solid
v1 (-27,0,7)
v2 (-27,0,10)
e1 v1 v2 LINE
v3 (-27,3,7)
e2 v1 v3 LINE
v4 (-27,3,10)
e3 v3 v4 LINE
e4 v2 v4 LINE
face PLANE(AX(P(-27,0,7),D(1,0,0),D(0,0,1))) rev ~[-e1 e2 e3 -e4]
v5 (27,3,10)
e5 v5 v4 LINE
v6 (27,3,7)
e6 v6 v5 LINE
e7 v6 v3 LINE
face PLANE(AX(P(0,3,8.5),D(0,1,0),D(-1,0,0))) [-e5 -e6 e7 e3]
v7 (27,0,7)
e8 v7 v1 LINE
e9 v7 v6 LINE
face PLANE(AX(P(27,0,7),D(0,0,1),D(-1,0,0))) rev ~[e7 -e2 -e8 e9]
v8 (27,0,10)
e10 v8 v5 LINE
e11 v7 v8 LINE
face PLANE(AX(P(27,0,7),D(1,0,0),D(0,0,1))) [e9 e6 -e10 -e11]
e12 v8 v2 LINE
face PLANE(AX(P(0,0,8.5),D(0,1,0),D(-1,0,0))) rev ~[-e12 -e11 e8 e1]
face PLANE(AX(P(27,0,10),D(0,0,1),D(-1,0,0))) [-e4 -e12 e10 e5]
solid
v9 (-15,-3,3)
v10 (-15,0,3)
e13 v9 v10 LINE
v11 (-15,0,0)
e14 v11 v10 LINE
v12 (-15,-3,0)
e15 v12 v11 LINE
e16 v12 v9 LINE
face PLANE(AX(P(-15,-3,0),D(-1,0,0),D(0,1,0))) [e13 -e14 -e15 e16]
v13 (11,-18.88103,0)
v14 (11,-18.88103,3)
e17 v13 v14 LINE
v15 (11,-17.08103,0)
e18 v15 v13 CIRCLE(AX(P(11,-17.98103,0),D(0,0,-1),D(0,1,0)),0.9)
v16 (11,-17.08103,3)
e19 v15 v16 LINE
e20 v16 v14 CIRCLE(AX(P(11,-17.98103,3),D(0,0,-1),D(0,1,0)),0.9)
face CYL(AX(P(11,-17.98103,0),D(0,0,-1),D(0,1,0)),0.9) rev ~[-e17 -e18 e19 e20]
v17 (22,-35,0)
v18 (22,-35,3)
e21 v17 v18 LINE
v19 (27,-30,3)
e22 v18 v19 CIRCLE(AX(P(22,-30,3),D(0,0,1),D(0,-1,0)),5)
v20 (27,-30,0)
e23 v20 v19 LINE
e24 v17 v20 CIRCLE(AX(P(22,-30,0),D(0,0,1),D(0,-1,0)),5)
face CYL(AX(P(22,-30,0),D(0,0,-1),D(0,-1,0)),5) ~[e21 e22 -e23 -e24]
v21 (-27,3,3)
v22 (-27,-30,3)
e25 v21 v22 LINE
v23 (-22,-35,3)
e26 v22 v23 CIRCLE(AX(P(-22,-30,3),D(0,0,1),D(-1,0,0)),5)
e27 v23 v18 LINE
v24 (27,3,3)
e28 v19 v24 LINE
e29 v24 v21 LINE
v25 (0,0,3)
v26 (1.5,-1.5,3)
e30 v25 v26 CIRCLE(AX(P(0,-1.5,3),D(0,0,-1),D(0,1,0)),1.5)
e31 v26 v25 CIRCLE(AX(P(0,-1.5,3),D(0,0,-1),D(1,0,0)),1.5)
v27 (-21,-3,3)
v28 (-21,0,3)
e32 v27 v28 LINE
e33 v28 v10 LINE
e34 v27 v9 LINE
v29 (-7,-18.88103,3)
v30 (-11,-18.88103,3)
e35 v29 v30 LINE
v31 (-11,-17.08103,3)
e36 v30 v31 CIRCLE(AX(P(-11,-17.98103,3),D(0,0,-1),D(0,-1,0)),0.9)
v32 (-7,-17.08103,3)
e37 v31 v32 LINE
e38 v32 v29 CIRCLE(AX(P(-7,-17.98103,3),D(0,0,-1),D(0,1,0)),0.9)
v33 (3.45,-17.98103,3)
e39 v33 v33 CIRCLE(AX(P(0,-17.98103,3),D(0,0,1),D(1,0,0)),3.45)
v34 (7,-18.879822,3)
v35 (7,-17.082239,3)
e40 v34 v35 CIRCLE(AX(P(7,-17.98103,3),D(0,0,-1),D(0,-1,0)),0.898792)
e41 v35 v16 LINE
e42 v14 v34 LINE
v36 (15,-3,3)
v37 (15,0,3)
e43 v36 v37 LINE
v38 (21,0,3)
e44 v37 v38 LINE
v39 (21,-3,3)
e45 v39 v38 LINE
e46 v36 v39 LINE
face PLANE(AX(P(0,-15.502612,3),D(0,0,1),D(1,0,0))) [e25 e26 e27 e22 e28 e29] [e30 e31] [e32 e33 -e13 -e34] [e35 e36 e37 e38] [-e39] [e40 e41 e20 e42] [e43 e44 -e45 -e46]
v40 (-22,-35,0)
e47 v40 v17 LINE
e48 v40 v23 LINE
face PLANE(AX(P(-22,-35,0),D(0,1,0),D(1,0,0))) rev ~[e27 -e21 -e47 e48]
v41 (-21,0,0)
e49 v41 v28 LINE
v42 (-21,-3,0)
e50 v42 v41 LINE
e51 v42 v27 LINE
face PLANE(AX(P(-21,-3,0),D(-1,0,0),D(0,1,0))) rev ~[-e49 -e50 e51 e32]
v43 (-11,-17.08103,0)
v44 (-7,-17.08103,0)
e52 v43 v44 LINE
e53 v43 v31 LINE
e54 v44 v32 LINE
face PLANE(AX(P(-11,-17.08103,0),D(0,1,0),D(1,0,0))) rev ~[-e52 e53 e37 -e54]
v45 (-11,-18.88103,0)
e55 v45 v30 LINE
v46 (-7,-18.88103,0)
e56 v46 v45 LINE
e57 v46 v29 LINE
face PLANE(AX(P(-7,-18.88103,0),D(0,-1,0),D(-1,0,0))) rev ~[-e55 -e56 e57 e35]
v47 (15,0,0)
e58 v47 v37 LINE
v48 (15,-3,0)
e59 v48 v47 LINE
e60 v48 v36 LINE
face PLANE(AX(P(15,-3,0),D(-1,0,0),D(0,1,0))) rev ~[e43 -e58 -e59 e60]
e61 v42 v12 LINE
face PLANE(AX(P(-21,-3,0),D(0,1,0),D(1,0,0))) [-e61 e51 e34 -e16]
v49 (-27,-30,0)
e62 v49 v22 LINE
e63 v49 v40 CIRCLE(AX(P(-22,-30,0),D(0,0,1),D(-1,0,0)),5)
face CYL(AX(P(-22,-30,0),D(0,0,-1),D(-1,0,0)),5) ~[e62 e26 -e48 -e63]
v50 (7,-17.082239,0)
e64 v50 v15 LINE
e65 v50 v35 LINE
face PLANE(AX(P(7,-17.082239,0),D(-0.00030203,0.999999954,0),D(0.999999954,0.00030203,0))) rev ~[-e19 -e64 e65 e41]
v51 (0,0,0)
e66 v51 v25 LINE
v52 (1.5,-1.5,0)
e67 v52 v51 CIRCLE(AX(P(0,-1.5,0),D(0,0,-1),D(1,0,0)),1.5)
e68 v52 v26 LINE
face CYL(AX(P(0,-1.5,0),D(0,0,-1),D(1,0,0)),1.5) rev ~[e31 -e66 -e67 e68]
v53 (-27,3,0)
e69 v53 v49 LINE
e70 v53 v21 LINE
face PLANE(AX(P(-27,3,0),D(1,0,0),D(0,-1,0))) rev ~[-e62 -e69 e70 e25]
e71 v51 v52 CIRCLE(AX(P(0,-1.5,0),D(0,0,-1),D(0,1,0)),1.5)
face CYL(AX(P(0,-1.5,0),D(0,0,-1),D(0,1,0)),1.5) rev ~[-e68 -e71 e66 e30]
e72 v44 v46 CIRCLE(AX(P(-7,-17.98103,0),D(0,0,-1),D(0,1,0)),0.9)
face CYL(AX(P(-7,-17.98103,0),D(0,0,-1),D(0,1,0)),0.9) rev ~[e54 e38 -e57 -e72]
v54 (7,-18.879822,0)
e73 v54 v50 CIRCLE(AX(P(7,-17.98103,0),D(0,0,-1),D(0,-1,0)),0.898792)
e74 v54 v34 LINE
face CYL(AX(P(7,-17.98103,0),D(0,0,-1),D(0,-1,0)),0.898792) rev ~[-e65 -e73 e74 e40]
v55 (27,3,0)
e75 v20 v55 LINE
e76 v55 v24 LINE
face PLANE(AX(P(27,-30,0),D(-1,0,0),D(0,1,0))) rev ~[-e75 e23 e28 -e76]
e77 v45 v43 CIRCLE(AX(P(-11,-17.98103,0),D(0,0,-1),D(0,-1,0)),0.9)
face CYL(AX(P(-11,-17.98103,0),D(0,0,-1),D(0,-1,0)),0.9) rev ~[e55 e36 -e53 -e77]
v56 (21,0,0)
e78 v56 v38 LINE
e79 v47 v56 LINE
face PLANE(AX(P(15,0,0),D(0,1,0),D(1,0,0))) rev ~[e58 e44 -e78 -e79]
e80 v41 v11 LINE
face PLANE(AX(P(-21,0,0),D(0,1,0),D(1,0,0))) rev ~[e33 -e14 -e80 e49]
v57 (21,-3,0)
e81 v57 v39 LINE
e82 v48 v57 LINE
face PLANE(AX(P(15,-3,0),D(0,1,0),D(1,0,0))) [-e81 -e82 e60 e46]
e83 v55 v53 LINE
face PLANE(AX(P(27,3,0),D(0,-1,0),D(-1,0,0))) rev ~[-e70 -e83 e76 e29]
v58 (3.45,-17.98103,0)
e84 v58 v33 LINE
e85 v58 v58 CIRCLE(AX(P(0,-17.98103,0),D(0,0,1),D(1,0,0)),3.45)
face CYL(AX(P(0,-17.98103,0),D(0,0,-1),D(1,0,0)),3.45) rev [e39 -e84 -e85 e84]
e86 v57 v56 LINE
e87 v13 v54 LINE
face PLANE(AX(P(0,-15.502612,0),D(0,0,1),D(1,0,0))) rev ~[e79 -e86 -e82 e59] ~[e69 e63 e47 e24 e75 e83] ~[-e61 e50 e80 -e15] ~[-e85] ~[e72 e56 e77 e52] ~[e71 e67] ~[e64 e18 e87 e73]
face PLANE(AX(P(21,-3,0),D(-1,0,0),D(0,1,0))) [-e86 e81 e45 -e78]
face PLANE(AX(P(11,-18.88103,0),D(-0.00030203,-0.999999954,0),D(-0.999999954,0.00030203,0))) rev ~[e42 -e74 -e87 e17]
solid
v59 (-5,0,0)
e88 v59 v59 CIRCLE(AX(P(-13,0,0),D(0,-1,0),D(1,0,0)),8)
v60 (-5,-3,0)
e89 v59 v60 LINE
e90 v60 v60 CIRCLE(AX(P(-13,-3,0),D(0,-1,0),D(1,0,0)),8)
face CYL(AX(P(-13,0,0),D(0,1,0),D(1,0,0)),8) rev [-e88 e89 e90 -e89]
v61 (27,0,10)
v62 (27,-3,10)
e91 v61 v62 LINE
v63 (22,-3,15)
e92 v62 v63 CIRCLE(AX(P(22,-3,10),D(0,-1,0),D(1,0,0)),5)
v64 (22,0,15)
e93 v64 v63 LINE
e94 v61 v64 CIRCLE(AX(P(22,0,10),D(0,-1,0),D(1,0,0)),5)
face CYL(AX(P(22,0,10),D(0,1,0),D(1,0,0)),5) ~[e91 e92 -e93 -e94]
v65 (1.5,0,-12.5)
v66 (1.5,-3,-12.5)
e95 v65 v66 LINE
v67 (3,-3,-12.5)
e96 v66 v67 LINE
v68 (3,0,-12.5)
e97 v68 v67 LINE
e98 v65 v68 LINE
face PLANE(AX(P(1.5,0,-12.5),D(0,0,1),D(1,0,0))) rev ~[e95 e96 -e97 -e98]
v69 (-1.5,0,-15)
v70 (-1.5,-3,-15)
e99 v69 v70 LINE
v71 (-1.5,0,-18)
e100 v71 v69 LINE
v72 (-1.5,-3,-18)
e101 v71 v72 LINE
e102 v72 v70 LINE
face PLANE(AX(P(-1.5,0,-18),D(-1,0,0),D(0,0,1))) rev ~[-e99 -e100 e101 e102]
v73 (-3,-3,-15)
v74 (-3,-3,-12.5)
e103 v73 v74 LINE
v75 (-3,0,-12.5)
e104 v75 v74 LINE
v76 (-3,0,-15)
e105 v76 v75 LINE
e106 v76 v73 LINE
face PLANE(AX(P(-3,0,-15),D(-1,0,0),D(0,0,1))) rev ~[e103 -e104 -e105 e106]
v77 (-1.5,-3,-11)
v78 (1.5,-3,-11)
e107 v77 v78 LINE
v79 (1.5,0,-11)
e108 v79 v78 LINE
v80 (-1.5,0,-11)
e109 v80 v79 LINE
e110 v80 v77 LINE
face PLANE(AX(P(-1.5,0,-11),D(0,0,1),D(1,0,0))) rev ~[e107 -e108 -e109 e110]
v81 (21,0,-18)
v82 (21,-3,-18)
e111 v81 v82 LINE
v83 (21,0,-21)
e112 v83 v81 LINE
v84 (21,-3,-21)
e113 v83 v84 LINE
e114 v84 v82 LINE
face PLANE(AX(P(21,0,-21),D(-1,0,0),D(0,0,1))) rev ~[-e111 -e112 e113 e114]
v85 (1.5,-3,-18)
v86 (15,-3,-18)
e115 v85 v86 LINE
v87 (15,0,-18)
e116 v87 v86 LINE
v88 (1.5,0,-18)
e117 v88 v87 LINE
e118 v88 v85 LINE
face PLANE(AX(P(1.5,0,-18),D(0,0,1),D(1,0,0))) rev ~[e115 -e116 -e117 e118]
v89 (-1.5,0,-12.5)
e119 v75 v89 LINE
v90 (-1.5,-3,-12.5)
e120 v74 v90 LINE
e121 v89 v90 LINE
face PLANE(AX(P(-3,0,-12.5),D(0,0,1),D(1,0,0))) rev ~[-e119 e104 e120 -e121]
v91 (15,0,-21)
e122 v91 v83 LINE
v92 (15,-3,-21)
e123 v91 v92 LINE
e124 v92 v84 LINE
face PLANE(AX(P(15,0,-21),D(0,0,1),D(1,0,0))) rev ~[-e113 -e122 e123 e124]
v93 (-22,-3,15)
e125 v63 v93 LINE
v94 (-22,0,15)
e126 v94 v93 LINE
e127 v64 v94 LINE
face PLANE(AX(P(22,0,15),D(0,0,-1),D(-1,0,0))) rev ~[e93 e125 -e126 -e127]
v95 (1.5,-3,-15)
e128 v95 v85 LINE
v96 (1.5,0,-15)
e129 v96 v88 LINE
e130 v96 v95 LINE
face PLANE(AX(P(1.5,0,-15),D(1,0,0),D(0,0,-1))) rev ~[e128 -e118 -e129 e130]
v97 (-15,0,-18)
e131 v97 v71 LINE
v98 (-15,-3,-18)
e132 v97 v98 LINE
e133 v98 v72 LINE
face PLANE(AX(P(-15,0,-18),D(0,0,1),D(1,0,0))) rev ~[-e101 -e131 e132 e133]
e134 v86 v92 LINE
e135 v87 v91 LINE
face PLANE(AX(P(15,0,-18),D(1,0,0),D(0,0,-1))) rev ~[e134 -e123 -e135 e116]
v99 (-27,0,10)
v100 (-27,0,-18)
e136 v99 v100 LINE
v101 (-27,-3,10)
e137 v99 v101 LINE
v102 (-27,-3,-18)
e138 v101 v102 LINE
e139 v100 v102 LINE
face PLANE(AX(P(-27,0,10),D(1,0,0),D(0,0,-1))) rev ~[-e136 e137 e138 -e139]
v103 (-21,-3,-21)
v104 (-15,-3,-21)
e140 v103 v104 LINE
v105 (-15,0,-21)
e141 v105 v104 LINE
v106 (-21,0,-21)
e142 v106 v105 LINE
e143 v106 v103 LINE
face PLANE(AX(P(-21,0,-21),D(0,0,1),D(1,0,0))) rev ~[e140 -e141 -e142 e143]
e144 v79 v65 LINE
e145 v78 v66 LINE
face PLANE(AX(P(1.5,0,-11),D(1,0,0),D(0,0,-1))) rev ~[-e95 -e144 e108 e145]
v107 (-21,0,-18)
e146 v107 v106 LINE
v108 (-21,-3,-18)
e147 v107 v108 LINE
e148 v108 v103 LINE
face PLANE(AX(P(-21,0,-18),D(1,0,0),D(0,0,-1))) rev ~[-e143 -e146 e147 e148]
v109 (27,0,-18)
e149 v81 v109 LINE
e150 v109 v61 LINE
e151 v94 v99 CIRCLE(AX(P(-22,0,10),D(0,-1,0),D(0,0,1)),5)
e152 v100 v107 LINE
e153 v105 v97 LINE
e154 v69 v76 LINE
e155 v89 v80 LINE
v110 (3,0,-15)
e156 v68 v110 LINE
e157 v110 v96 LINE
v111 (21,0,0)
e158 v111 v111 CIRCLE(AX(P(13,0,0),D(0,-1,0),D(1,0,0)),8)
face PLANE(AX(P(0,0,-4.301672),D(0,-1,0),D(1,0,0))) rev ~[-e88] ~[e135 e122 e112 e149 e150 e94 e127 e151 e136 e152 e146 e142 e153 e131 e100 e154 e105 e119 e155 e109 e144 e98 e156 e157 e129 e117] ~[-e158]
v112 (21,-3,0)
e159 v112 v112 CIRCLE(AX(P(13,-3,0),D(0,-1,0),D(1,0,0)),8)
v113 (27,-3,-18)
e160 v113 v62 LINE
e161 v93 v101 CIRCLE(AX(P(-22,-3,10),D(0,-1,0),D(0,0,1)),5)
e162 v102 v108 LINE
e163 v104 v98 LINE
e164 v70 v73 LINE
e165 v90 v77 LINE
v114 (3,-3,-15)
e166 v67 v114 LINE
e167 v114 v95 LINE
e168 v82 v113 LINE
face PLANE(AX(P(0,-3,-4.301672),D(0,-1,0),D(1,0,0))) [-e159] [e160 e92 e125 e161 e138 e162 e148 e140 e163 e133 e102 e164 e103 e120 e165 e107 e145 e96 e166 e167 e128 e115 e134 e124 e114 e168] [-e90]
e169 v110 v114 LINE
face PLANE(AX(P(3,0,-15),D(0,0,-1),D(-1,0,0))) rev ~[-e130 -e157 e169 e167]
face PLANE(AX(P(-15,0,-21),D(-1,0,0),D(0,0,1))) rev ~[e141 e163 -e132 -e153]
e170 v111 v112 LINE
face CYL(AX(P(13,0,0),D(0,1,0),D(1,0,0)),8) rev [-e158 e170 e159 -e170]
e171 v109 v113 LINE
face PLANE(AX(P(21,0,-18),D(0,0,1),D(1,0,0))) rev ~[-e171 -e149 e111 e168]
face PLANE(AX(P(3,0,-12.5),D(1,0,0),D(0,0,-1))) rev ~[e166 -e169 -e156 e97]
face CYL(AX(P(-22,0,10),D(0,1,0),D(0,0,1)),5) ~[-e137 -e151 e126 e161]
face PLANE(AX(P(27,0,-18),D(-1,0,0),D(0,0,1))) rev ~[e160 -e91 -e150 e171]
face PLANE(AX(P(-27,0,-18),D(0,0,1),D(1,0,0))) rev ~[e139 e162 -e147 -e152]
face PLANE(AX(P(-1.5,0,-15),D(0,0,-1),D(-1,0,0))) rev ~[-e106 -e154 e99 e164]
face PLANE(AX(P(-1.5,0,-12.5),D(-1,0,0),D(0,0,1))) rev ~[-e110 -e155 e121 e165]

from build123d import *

# Parameters (mm, degrees)
F0_R     = 8
F1_DEPTH = 3
F2_W     = 54
F2_H     = 3
F3_DEPTH = 3
F4_R     = 3.45
F4_W     = 6
F4_H     = 3
F5_DEPTH = 3


# Not quite as in the source:
# - a feature names something its author has since deleted; it is built from what else it names


with BuildPart() as f1:
    # F0 (on Front) → F1 (new body)
    with BuildSketch(Plane.XZ):
        with BuildLine():
            Line((22, 15), (-22, 15))
            ThreePointArc((-22, 15), (-25.5355339059, 13.5355339059), (-27, 10))
            Line((-27, 10), (-27, -15))
            Line((-27, -15), (-27, -18))
            Line((-27, -18), (-21, -18))
            Line((-21, -18), (-21, -21))
            Line((-21, -21), (-15, -21))
            Line((-15, -21), (-15, -18))
            Line((-15, -18), (-9, -18))
            Line((-9, -18), (-3, -18))
            Line((-3, -18), (-1.5, -18))
            Line((-1.5, -18), (-1.5, -15))
            Line((-1.5, -15), (-3, -15))
            Line((-3, -15), (-3, -12.5))
            Line((-3, -12.5), (-1.5, -12.5))
            Line((-1.5, -12.5), (-1.5, -11))
            Line((-1.5, -11), (0, -11))
            Line((0, -11), (1.5, -11))
            Line((1.5, -11), (1.5, -12.5))
            Line((1.5, -12.5), (3, -12.5))
            Line((3, -12.5), (3, -15))
            Line((3, -15), (1.5, -15))
            Line((1.5, -15), (1.5, -18))
            Line((1.5, -18), (3, -18))
            Line((3, -18), (9, -18))
            Line((9, -18), (15, -18))
            Line((15, -18), (15, -21))
            Line((15, -21), (21, -21))
            Line((21, -21), (21, -18))
            Line((21, -18), (27, -18))
            Line((27, -18), (27, -15))
            Line((27, -15), (27, 10))
            ThreePointArc((27, 10), (25.5355339059, 13.5355339059), (22, 15))
        make_face()
        with Locations((-13, 0)):
            Circle(F0_R, mode=Mode.SUBTRACT)
        with Locations((13, 0)):
            Circle(F0_R, mode=Mode.SUBTRACT)
    extrude(amount=F1_DEPTH)


with BuildPart() as f3:
    # F2 (on face) → F3 (new body)
    with BuildSketch(Plane(origin=(0, 0, 0), x_dir=(-1, 0, 0), z_dir=(0, 1, 0))):
        with Locations((0, 8.5)):
            Rectangle(F2_W, F2_H)
    extrude(amount=F3_DEPTH)


with BuildPart() as f5:
    # F4 (on Top) → F5 (new body)
    with BuildSketch(Plane.XY):
        with BuildLine():
            Line((-27, 0), (-27, -3))
            Line((-27, -3), (-27, -30))
            ThreePointArc((-27, -30), (-25.5355339059, -33.5355339059), (-22, -35))
            Line((-22, -35), (22, -35))
            ThreePointArc((22, -35), (25.5355339059, -33.5355339059), (27, -30))
            Line((27, -30), (27, -3))
            Line((27, -3), (27, 0))
            Line((27, 0), (27, 3))
            Line((27, 3), (-27, 3))
            Line((-27, 3), (-27, 0))
        make_face()
        with BuildLine():
            Line((-7, -18.8810304218), (-11, -18.8810304218))
            ThreePointArc((-11, -18.8810304218), (-11.9, -17.9810304218), (-11, -17.0810304218))
            Line((-11, -17.0810304218), (-7, -17.0810304218))
            ThreePointArc((-7, -17.0810304218), (-6.1, -17.9810304218), (-7, -18.8810304218))
        make_face(mode=Mode.SUBTRACT)
        with Locations((0, -17.9810304218)):
            Circle(F4_R, mode=Mode.SUBTRACT)
        with BuildLine():
            ThreePointArc((11, -17.0810304218), (11.9, -17.9810304218), (11, -18.8810304218))
            Line((11, -18.8810304218), (7, -18.8798223013))
            ThreePointArc((7, -18.8798223013), (6.1012081205, -17.9810304218), (7, -17.0822385423))
            Line((7, -17.0822385423), (11, -17.0810304218))
        make_face(mode=Mode.SUBTRACT)
        with Locations((-18, -1.5)):
            Rectangle(F4_W, F4_H, mode=Mode.SUBTRACT)
        with BuildLine():
            ThreePointArc((0, 0), (1.0606601718, -0.4393398282), (1.5, -1.5))
            ThreePointArc((1.5, -1.5), (-1.0606601718, -2.5606601718), (0, 0))
        make_face(mode=Mode.SUBTRACT)
        with Locations((18, -1.5)):
            Rectangle(F4_W, F4_H, mode=Mode.SUBTRACT)
    extrude(amount=F5_DEPTH)


solid = Compound([f1.part, f3.part, f5.part])
